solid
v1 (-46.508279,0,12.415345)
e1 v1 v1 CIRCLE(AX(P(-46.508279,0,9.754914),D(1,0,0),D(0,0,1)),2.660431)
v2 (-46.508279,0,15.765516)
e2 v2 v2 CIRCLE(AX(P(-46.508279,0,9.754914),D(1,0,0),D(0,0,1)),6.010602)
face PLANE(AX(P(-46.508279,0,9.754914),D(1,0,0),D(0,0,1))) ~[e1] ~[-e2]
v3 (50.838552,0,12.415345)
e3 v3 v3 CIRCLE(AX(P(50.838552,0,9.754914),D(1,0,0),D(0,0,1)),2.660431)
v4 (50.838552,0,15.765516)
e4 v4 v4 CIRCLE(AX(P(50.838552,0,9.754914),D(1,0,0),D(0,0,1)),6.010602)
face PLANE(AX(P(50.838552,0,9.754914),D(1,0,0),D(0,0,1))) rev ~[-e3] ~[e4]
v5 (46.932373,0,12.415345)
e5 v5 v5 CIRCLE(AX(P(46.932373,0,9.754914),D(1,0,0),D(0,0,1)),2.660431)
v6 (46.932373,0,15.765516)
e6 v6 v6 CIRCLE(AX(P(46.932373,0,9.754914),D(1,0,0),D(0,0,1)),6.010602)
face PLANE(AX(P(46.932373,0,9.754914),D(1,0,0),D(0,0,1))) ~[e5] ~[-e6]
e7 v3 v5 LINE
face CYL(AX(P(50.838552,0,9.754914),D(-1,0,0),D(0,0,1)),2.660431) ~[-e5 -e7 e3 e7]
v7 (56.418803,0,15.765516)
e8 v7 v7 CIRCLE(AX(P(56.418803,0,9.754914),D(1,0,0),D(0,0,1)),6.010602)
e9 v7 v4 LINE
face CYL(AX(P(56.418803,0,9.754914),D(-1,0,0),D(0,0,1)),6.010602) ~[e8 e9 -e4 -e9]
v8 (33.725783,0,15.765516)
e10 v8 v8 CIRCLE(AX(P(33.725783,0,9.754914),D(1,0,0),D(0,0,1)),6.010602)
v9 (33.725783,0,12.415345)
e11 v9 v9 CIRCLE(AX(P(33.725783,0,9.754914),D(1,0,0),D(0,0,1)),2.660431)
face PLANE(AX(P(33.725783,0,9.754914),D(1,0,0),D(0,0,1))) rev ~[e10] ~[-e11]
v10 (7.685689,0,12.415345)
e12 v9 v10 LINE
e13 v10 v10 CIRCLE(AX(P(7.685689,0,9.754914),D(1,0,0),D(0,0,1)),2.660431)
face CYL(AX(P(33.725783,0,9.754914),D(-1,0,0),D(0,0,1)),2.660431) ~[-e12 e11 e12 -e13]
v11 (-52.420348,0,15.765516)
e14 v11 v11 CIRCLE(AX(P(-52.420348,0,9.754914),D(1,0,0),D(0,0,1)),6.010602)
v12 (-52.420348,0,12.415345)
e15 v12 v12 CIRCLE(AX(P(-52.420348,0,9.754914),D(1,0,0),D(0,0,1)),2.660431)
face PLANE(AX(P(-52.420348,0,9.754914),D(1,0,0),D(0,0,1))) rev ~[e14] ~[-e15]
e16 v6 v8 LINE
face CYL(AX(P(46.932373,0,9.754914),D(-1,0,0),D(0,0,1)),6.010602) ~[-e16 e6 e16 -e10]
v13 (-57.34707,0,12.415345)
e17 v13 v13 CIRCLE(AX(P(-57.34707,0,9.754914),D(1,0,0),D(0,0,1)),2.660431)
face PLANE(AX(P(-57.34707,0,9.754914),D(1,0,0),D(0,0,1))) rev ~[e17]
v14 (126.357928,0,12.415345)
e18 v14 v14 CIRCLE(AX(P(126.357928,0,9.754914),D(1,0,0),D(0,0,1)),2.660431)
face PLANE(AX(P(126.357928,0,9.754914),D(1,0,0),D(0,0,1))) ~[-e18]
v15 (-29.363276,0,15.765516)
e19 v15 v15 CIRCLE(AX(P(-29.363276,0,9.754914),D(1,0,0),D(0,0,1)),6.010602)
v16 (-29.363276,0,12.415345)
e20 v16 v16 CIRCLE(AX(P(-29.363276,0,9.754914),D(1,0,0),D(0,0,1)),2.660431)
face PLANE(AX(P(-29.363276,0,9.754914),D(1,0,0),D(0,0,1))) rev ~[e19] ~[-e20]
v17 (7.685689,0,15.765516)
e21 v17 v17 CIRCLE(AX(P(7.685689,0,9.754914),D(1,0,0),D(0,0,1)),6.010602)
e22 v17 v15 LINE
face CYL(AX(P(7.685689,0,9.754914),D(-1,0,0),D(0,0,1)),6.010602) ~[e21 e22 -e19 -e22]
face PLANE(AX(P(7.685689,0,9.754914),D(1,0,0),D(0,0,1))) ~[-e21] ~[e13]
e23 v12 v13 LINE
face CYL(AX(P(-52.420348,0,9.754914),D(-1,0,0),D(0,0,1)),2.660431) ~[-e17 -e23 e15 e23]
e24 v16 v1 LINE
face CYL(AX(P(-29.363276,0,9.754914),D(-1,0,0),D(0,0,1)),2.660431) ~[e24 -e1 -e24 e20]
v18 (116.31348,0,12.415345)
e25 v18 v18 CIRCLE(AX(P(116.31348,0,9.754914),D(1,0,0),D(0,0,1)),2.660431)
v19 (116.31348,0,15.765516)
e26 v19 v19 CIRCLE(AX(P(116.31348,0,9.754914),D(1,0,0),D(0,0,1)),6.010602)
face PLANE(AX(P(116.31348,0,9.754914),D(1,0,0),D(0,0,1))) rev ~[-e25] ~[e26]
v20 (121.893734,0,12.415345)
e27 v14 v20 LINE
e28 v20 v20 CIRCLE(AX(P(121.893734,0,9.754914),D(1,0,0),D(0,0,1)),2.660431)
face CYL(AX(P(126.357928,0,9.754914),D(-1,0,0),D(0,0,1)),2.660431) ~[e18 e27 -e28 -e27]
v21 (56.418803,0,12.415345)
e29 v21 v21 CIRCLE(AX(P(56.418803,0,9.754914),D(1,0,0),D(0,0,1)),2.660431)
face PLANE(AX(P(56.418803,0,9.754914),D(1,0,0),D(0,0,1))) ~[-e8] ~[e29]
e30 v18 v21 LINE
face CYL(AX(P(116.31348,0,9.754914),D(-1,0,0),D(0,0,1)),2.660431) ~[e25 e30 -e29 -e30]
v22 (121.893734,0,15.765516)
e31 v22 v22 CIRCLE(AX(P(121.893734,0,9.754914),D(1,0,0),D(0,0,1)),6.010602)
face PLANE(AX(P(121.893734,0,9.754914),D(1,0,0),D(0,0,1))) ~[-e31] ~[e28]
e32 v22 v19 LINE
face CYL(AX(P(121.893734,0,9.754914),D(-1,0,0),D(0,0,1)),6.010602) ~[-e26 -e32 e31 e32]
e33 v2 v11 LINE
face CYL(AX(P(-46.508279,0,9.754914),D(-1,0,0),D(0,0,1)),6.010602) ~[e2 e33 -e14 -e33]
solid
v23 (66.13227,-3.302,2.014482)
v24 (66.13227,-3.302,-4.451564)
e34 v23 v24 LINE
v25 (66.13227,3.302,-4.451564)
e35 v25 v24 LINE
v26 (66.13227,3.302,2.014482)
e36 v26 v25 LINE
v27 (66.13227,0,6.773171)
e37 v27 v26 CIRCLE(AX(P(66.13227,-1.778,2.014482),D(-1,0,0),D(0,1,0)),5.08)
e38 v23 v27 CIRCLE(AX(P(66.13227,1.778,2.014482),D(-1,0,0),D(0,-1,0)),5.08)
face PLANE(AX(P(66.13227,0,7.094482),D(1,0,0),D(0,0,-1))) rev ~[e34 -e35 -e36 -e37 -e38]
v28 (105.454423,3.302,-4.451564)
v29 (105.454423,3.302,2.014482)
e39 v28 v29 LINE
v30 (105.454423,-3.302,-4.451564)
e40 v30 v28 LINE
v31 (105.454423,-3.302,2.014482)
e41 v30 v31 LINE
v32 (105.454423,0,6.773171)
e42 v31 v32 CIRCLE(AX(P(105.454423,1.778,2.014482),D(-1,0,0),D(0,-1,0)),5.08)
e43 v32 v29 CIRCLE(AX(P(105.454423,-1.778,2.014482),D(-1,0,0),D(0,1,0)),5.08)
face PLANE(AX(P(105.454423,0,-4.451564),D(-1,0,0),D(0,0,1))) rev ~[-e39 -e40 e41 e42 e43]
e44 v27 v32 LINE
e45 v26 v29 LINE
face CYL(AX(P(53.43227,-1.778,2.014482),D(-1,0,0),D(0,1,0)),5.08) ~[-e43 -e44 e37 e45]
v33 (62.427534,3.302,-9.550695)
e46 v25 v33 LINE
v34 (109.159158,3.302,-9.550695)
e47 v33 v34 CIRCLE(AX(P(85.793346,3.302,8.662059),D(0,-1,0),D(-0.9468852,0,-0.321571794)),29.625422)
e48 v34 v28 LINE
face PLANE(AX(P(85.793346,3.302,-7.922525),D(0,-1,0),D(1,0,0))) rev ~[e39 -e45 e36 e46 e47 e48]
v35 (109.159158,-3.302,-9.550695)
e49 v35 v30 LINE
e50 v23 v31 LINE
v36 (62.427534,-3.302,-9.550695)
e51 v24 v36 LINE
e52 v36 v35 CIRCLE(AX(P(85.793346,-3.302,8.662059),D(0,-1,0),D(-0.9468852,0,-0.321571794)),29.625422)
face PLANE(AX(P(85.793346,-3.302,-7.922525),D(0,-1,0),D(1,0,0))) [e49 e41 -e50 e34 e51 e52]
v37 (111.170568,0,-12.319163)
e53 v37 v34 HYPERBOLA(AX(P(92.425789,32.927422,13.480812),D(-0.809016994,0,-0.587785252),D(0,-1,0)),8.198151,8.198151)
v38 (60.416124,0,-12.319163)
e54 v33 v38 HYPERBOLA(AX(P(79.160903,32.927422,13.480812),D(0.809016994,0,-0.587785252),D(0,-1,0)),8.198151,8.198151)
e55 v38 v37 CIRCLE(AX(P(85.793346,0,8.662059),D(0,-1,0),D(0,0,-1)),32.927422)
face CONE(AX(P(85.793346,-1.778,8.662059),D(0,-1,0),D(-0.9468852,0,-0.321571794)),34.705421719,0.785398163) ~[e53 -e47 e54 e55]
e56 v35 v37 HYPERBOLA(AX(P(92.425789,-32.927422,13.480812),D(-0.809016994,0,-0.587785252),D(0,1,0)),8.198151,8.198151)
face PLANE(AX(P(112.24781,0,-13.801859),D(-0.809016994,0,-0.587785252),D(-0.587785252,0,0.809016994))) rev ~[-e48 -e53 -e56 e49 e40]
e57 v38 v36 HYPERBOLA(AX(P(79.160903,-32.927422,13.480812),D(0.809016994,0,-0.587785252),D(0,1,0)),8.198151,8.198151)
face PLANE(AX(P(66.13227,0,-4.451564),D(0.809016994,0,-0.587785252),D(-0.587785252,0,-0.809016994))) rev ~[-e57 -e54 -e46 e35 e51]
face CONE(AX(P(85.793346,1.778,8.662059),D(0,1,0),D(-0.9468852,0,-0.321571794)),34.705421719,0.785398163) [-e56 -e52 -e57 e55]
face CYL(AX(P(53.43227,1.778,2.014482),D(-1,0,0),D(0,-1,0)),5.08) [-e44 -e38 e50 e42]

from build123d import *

# Parameters (mm, degrees)
F2_DEPTH    = 3.302
F3_DEPTH    = 3.302
F4_T2_ANGLE = 142.4839860816
F4_T4_ANGLE = 142.4839860816
F5_T1_DEPTH = 64.7221527338


# Not quite as in the source:
# - a fillet or chamfer that OpenCascade refuses, or shapes differently, is made with other operations: its cross-section is extruded or revolved along the edge and cut away or added


with BuildPart() as f1:
    # F0 (on Front) → F1 (revolve)
    with BuildSketch(Plane.XZ):
        Polygon((-57.3470704257, 12.4153448269), (-57.3470704257, 9.7549136262), (126.3579279184, 9.7549136262), (126.3579279184, 12.4153448269), (121.8937337399, 12.4153448269), (121.8937337399, 15.7655160874), (116.3134798408, 15.7655160874), (116.3134798408, 12.4153448269), (56.4188025892, 12.4153448269), (56.4188025892, 15.7655160874), (50.8385524154, 15.7655160874), (50.8385524154, 12.4153448269), (46.9323731959, 12.4153448269), (46.9323731959, 15.7655160874), (33.7257832289, 15.7655160874), (33.7257832289, 12.4153448269), (7.6856887899, 12.4153448269), (7.6856887899, 15.7655160874), (-29.3632764369, 15.7655160874), (-29.3632764369, 12.4153448269), (-46.5082786977, 12.4153448269), (-46.5082786977, 15.7655160874), (-52.420347929, 15.7655160874), (-52.420347929, 12.4153448269), align=None)
    revolve(axis=Axis((34.5054287463, 0, 9.7549136262), (1, 0, 0)))


with BuildPart() as f2:
    # F0 (on Front) → F2 (new body)
    with BuildSketch(Plane.XZ):
        with BuildLine():
            Line((105.4544225335, -4.4515635818), (105.4544225335, 7.0944824256))
            Line((105.4544225335, 7.0944824256), (66.1322697997, 7.0944824256))
            Line((66.1322697997, 7.0944824256), (66.1322697997, -4.4515635818))
            Line((66.1322697997, -4.4515635818), (59.3388823657, -13.8018592247))
            ThreePointArc((59.3388823657, -13.8018592247), (85.7933461666, -26.0433622806), (112.2478099675, -13.8018592247))
            Line((112.2478099675, -13.8018592247), (105.4544225335, -4.4515635818))
        make_face()
    extrude(amount=-F2_DEPTH)

    # F3 (add): a face of the model
    f3_faces = [f2.faces().sort_by_distance(p)[0] for p in [
        (85.7933461666, 0, -8.9000253062),
    ]]
    extrude(f3_faces, amount=F3_DEPTH)

    # F4: chamfer of 5.08 on 2 edges, made by hand

    # F4_s1 → F4_t2 (revolve, cut)
    with BuildSketch(Plane(origin=(6.2342301427, 0, -18.3570212695), x_dir=(0, 1, 0), z_dir=(-0.3215717936, 0, 0.9468851998))):
        Polygon((1.778, -49.3165019961), (-3.302, -54.3965019961), (-3.302, -49.3165019961), align=None)
    revolve(axis=Axis((85.7933461666, -3.302, 8.6620594386), (0, -1, 0)), revolution_arc=F4_T2_ANGLE, mode=Mode.SUBTRACT)

    # F4_s3 → F4_t4 (revolve, cut)
    with BuildSketch(Plane(origin=(6.2342301427, 0, -18.3570212695), x_dir=(0, 1, 0), z_dir=(-0.3215717936, 0, 0.9468851998))):
        Polygon((-1.778, -49.3165019961), (3.302, -54.3965019961), (3.302, -49.3165019961), align=None)
    revolve(axis=Axis((85.7933461666, 3.302, 8.6620594386), (0, -1, 0)), revolution_arc=F4_T4_ANGLE, mode=Mode.SUBTRACT)

    # F5: fillet of radius 5.08 on 2 edges, made by hand

    # F5_s2 → F5_t1 (cut)
    with BuildSketch(Plane.YZ.offset(53.4322697997)):
        with BuildLine():
            ThreePointArc((-3.302, 2.0144824256), (-1.8141024484, 5.606584874), (1.778, 7.0944824256))
            Line((1.778, 7.0944824256), (-3.302, 7.0944824256))
            Line((-3.302, 7.0944824256), (-3.302, 2.0144824256))
        make_face()
        with BuildLine():
            ThreePointArc((3.302, 2.0144824256), (1.8141024484, 5.606584874), (-1.778, 7.0944824256))
            Line((-1.778, 7.0944824256), (3.302, 7.0944824256))
            Line((3.302, 7.0944824256), (3.302, 2.0144824256))
        make_face()
    extrude(amount=F5_T1_DEPTH, mode=Mode.SUBTRACT)


solid = Compound([f1.part, f2.part])
